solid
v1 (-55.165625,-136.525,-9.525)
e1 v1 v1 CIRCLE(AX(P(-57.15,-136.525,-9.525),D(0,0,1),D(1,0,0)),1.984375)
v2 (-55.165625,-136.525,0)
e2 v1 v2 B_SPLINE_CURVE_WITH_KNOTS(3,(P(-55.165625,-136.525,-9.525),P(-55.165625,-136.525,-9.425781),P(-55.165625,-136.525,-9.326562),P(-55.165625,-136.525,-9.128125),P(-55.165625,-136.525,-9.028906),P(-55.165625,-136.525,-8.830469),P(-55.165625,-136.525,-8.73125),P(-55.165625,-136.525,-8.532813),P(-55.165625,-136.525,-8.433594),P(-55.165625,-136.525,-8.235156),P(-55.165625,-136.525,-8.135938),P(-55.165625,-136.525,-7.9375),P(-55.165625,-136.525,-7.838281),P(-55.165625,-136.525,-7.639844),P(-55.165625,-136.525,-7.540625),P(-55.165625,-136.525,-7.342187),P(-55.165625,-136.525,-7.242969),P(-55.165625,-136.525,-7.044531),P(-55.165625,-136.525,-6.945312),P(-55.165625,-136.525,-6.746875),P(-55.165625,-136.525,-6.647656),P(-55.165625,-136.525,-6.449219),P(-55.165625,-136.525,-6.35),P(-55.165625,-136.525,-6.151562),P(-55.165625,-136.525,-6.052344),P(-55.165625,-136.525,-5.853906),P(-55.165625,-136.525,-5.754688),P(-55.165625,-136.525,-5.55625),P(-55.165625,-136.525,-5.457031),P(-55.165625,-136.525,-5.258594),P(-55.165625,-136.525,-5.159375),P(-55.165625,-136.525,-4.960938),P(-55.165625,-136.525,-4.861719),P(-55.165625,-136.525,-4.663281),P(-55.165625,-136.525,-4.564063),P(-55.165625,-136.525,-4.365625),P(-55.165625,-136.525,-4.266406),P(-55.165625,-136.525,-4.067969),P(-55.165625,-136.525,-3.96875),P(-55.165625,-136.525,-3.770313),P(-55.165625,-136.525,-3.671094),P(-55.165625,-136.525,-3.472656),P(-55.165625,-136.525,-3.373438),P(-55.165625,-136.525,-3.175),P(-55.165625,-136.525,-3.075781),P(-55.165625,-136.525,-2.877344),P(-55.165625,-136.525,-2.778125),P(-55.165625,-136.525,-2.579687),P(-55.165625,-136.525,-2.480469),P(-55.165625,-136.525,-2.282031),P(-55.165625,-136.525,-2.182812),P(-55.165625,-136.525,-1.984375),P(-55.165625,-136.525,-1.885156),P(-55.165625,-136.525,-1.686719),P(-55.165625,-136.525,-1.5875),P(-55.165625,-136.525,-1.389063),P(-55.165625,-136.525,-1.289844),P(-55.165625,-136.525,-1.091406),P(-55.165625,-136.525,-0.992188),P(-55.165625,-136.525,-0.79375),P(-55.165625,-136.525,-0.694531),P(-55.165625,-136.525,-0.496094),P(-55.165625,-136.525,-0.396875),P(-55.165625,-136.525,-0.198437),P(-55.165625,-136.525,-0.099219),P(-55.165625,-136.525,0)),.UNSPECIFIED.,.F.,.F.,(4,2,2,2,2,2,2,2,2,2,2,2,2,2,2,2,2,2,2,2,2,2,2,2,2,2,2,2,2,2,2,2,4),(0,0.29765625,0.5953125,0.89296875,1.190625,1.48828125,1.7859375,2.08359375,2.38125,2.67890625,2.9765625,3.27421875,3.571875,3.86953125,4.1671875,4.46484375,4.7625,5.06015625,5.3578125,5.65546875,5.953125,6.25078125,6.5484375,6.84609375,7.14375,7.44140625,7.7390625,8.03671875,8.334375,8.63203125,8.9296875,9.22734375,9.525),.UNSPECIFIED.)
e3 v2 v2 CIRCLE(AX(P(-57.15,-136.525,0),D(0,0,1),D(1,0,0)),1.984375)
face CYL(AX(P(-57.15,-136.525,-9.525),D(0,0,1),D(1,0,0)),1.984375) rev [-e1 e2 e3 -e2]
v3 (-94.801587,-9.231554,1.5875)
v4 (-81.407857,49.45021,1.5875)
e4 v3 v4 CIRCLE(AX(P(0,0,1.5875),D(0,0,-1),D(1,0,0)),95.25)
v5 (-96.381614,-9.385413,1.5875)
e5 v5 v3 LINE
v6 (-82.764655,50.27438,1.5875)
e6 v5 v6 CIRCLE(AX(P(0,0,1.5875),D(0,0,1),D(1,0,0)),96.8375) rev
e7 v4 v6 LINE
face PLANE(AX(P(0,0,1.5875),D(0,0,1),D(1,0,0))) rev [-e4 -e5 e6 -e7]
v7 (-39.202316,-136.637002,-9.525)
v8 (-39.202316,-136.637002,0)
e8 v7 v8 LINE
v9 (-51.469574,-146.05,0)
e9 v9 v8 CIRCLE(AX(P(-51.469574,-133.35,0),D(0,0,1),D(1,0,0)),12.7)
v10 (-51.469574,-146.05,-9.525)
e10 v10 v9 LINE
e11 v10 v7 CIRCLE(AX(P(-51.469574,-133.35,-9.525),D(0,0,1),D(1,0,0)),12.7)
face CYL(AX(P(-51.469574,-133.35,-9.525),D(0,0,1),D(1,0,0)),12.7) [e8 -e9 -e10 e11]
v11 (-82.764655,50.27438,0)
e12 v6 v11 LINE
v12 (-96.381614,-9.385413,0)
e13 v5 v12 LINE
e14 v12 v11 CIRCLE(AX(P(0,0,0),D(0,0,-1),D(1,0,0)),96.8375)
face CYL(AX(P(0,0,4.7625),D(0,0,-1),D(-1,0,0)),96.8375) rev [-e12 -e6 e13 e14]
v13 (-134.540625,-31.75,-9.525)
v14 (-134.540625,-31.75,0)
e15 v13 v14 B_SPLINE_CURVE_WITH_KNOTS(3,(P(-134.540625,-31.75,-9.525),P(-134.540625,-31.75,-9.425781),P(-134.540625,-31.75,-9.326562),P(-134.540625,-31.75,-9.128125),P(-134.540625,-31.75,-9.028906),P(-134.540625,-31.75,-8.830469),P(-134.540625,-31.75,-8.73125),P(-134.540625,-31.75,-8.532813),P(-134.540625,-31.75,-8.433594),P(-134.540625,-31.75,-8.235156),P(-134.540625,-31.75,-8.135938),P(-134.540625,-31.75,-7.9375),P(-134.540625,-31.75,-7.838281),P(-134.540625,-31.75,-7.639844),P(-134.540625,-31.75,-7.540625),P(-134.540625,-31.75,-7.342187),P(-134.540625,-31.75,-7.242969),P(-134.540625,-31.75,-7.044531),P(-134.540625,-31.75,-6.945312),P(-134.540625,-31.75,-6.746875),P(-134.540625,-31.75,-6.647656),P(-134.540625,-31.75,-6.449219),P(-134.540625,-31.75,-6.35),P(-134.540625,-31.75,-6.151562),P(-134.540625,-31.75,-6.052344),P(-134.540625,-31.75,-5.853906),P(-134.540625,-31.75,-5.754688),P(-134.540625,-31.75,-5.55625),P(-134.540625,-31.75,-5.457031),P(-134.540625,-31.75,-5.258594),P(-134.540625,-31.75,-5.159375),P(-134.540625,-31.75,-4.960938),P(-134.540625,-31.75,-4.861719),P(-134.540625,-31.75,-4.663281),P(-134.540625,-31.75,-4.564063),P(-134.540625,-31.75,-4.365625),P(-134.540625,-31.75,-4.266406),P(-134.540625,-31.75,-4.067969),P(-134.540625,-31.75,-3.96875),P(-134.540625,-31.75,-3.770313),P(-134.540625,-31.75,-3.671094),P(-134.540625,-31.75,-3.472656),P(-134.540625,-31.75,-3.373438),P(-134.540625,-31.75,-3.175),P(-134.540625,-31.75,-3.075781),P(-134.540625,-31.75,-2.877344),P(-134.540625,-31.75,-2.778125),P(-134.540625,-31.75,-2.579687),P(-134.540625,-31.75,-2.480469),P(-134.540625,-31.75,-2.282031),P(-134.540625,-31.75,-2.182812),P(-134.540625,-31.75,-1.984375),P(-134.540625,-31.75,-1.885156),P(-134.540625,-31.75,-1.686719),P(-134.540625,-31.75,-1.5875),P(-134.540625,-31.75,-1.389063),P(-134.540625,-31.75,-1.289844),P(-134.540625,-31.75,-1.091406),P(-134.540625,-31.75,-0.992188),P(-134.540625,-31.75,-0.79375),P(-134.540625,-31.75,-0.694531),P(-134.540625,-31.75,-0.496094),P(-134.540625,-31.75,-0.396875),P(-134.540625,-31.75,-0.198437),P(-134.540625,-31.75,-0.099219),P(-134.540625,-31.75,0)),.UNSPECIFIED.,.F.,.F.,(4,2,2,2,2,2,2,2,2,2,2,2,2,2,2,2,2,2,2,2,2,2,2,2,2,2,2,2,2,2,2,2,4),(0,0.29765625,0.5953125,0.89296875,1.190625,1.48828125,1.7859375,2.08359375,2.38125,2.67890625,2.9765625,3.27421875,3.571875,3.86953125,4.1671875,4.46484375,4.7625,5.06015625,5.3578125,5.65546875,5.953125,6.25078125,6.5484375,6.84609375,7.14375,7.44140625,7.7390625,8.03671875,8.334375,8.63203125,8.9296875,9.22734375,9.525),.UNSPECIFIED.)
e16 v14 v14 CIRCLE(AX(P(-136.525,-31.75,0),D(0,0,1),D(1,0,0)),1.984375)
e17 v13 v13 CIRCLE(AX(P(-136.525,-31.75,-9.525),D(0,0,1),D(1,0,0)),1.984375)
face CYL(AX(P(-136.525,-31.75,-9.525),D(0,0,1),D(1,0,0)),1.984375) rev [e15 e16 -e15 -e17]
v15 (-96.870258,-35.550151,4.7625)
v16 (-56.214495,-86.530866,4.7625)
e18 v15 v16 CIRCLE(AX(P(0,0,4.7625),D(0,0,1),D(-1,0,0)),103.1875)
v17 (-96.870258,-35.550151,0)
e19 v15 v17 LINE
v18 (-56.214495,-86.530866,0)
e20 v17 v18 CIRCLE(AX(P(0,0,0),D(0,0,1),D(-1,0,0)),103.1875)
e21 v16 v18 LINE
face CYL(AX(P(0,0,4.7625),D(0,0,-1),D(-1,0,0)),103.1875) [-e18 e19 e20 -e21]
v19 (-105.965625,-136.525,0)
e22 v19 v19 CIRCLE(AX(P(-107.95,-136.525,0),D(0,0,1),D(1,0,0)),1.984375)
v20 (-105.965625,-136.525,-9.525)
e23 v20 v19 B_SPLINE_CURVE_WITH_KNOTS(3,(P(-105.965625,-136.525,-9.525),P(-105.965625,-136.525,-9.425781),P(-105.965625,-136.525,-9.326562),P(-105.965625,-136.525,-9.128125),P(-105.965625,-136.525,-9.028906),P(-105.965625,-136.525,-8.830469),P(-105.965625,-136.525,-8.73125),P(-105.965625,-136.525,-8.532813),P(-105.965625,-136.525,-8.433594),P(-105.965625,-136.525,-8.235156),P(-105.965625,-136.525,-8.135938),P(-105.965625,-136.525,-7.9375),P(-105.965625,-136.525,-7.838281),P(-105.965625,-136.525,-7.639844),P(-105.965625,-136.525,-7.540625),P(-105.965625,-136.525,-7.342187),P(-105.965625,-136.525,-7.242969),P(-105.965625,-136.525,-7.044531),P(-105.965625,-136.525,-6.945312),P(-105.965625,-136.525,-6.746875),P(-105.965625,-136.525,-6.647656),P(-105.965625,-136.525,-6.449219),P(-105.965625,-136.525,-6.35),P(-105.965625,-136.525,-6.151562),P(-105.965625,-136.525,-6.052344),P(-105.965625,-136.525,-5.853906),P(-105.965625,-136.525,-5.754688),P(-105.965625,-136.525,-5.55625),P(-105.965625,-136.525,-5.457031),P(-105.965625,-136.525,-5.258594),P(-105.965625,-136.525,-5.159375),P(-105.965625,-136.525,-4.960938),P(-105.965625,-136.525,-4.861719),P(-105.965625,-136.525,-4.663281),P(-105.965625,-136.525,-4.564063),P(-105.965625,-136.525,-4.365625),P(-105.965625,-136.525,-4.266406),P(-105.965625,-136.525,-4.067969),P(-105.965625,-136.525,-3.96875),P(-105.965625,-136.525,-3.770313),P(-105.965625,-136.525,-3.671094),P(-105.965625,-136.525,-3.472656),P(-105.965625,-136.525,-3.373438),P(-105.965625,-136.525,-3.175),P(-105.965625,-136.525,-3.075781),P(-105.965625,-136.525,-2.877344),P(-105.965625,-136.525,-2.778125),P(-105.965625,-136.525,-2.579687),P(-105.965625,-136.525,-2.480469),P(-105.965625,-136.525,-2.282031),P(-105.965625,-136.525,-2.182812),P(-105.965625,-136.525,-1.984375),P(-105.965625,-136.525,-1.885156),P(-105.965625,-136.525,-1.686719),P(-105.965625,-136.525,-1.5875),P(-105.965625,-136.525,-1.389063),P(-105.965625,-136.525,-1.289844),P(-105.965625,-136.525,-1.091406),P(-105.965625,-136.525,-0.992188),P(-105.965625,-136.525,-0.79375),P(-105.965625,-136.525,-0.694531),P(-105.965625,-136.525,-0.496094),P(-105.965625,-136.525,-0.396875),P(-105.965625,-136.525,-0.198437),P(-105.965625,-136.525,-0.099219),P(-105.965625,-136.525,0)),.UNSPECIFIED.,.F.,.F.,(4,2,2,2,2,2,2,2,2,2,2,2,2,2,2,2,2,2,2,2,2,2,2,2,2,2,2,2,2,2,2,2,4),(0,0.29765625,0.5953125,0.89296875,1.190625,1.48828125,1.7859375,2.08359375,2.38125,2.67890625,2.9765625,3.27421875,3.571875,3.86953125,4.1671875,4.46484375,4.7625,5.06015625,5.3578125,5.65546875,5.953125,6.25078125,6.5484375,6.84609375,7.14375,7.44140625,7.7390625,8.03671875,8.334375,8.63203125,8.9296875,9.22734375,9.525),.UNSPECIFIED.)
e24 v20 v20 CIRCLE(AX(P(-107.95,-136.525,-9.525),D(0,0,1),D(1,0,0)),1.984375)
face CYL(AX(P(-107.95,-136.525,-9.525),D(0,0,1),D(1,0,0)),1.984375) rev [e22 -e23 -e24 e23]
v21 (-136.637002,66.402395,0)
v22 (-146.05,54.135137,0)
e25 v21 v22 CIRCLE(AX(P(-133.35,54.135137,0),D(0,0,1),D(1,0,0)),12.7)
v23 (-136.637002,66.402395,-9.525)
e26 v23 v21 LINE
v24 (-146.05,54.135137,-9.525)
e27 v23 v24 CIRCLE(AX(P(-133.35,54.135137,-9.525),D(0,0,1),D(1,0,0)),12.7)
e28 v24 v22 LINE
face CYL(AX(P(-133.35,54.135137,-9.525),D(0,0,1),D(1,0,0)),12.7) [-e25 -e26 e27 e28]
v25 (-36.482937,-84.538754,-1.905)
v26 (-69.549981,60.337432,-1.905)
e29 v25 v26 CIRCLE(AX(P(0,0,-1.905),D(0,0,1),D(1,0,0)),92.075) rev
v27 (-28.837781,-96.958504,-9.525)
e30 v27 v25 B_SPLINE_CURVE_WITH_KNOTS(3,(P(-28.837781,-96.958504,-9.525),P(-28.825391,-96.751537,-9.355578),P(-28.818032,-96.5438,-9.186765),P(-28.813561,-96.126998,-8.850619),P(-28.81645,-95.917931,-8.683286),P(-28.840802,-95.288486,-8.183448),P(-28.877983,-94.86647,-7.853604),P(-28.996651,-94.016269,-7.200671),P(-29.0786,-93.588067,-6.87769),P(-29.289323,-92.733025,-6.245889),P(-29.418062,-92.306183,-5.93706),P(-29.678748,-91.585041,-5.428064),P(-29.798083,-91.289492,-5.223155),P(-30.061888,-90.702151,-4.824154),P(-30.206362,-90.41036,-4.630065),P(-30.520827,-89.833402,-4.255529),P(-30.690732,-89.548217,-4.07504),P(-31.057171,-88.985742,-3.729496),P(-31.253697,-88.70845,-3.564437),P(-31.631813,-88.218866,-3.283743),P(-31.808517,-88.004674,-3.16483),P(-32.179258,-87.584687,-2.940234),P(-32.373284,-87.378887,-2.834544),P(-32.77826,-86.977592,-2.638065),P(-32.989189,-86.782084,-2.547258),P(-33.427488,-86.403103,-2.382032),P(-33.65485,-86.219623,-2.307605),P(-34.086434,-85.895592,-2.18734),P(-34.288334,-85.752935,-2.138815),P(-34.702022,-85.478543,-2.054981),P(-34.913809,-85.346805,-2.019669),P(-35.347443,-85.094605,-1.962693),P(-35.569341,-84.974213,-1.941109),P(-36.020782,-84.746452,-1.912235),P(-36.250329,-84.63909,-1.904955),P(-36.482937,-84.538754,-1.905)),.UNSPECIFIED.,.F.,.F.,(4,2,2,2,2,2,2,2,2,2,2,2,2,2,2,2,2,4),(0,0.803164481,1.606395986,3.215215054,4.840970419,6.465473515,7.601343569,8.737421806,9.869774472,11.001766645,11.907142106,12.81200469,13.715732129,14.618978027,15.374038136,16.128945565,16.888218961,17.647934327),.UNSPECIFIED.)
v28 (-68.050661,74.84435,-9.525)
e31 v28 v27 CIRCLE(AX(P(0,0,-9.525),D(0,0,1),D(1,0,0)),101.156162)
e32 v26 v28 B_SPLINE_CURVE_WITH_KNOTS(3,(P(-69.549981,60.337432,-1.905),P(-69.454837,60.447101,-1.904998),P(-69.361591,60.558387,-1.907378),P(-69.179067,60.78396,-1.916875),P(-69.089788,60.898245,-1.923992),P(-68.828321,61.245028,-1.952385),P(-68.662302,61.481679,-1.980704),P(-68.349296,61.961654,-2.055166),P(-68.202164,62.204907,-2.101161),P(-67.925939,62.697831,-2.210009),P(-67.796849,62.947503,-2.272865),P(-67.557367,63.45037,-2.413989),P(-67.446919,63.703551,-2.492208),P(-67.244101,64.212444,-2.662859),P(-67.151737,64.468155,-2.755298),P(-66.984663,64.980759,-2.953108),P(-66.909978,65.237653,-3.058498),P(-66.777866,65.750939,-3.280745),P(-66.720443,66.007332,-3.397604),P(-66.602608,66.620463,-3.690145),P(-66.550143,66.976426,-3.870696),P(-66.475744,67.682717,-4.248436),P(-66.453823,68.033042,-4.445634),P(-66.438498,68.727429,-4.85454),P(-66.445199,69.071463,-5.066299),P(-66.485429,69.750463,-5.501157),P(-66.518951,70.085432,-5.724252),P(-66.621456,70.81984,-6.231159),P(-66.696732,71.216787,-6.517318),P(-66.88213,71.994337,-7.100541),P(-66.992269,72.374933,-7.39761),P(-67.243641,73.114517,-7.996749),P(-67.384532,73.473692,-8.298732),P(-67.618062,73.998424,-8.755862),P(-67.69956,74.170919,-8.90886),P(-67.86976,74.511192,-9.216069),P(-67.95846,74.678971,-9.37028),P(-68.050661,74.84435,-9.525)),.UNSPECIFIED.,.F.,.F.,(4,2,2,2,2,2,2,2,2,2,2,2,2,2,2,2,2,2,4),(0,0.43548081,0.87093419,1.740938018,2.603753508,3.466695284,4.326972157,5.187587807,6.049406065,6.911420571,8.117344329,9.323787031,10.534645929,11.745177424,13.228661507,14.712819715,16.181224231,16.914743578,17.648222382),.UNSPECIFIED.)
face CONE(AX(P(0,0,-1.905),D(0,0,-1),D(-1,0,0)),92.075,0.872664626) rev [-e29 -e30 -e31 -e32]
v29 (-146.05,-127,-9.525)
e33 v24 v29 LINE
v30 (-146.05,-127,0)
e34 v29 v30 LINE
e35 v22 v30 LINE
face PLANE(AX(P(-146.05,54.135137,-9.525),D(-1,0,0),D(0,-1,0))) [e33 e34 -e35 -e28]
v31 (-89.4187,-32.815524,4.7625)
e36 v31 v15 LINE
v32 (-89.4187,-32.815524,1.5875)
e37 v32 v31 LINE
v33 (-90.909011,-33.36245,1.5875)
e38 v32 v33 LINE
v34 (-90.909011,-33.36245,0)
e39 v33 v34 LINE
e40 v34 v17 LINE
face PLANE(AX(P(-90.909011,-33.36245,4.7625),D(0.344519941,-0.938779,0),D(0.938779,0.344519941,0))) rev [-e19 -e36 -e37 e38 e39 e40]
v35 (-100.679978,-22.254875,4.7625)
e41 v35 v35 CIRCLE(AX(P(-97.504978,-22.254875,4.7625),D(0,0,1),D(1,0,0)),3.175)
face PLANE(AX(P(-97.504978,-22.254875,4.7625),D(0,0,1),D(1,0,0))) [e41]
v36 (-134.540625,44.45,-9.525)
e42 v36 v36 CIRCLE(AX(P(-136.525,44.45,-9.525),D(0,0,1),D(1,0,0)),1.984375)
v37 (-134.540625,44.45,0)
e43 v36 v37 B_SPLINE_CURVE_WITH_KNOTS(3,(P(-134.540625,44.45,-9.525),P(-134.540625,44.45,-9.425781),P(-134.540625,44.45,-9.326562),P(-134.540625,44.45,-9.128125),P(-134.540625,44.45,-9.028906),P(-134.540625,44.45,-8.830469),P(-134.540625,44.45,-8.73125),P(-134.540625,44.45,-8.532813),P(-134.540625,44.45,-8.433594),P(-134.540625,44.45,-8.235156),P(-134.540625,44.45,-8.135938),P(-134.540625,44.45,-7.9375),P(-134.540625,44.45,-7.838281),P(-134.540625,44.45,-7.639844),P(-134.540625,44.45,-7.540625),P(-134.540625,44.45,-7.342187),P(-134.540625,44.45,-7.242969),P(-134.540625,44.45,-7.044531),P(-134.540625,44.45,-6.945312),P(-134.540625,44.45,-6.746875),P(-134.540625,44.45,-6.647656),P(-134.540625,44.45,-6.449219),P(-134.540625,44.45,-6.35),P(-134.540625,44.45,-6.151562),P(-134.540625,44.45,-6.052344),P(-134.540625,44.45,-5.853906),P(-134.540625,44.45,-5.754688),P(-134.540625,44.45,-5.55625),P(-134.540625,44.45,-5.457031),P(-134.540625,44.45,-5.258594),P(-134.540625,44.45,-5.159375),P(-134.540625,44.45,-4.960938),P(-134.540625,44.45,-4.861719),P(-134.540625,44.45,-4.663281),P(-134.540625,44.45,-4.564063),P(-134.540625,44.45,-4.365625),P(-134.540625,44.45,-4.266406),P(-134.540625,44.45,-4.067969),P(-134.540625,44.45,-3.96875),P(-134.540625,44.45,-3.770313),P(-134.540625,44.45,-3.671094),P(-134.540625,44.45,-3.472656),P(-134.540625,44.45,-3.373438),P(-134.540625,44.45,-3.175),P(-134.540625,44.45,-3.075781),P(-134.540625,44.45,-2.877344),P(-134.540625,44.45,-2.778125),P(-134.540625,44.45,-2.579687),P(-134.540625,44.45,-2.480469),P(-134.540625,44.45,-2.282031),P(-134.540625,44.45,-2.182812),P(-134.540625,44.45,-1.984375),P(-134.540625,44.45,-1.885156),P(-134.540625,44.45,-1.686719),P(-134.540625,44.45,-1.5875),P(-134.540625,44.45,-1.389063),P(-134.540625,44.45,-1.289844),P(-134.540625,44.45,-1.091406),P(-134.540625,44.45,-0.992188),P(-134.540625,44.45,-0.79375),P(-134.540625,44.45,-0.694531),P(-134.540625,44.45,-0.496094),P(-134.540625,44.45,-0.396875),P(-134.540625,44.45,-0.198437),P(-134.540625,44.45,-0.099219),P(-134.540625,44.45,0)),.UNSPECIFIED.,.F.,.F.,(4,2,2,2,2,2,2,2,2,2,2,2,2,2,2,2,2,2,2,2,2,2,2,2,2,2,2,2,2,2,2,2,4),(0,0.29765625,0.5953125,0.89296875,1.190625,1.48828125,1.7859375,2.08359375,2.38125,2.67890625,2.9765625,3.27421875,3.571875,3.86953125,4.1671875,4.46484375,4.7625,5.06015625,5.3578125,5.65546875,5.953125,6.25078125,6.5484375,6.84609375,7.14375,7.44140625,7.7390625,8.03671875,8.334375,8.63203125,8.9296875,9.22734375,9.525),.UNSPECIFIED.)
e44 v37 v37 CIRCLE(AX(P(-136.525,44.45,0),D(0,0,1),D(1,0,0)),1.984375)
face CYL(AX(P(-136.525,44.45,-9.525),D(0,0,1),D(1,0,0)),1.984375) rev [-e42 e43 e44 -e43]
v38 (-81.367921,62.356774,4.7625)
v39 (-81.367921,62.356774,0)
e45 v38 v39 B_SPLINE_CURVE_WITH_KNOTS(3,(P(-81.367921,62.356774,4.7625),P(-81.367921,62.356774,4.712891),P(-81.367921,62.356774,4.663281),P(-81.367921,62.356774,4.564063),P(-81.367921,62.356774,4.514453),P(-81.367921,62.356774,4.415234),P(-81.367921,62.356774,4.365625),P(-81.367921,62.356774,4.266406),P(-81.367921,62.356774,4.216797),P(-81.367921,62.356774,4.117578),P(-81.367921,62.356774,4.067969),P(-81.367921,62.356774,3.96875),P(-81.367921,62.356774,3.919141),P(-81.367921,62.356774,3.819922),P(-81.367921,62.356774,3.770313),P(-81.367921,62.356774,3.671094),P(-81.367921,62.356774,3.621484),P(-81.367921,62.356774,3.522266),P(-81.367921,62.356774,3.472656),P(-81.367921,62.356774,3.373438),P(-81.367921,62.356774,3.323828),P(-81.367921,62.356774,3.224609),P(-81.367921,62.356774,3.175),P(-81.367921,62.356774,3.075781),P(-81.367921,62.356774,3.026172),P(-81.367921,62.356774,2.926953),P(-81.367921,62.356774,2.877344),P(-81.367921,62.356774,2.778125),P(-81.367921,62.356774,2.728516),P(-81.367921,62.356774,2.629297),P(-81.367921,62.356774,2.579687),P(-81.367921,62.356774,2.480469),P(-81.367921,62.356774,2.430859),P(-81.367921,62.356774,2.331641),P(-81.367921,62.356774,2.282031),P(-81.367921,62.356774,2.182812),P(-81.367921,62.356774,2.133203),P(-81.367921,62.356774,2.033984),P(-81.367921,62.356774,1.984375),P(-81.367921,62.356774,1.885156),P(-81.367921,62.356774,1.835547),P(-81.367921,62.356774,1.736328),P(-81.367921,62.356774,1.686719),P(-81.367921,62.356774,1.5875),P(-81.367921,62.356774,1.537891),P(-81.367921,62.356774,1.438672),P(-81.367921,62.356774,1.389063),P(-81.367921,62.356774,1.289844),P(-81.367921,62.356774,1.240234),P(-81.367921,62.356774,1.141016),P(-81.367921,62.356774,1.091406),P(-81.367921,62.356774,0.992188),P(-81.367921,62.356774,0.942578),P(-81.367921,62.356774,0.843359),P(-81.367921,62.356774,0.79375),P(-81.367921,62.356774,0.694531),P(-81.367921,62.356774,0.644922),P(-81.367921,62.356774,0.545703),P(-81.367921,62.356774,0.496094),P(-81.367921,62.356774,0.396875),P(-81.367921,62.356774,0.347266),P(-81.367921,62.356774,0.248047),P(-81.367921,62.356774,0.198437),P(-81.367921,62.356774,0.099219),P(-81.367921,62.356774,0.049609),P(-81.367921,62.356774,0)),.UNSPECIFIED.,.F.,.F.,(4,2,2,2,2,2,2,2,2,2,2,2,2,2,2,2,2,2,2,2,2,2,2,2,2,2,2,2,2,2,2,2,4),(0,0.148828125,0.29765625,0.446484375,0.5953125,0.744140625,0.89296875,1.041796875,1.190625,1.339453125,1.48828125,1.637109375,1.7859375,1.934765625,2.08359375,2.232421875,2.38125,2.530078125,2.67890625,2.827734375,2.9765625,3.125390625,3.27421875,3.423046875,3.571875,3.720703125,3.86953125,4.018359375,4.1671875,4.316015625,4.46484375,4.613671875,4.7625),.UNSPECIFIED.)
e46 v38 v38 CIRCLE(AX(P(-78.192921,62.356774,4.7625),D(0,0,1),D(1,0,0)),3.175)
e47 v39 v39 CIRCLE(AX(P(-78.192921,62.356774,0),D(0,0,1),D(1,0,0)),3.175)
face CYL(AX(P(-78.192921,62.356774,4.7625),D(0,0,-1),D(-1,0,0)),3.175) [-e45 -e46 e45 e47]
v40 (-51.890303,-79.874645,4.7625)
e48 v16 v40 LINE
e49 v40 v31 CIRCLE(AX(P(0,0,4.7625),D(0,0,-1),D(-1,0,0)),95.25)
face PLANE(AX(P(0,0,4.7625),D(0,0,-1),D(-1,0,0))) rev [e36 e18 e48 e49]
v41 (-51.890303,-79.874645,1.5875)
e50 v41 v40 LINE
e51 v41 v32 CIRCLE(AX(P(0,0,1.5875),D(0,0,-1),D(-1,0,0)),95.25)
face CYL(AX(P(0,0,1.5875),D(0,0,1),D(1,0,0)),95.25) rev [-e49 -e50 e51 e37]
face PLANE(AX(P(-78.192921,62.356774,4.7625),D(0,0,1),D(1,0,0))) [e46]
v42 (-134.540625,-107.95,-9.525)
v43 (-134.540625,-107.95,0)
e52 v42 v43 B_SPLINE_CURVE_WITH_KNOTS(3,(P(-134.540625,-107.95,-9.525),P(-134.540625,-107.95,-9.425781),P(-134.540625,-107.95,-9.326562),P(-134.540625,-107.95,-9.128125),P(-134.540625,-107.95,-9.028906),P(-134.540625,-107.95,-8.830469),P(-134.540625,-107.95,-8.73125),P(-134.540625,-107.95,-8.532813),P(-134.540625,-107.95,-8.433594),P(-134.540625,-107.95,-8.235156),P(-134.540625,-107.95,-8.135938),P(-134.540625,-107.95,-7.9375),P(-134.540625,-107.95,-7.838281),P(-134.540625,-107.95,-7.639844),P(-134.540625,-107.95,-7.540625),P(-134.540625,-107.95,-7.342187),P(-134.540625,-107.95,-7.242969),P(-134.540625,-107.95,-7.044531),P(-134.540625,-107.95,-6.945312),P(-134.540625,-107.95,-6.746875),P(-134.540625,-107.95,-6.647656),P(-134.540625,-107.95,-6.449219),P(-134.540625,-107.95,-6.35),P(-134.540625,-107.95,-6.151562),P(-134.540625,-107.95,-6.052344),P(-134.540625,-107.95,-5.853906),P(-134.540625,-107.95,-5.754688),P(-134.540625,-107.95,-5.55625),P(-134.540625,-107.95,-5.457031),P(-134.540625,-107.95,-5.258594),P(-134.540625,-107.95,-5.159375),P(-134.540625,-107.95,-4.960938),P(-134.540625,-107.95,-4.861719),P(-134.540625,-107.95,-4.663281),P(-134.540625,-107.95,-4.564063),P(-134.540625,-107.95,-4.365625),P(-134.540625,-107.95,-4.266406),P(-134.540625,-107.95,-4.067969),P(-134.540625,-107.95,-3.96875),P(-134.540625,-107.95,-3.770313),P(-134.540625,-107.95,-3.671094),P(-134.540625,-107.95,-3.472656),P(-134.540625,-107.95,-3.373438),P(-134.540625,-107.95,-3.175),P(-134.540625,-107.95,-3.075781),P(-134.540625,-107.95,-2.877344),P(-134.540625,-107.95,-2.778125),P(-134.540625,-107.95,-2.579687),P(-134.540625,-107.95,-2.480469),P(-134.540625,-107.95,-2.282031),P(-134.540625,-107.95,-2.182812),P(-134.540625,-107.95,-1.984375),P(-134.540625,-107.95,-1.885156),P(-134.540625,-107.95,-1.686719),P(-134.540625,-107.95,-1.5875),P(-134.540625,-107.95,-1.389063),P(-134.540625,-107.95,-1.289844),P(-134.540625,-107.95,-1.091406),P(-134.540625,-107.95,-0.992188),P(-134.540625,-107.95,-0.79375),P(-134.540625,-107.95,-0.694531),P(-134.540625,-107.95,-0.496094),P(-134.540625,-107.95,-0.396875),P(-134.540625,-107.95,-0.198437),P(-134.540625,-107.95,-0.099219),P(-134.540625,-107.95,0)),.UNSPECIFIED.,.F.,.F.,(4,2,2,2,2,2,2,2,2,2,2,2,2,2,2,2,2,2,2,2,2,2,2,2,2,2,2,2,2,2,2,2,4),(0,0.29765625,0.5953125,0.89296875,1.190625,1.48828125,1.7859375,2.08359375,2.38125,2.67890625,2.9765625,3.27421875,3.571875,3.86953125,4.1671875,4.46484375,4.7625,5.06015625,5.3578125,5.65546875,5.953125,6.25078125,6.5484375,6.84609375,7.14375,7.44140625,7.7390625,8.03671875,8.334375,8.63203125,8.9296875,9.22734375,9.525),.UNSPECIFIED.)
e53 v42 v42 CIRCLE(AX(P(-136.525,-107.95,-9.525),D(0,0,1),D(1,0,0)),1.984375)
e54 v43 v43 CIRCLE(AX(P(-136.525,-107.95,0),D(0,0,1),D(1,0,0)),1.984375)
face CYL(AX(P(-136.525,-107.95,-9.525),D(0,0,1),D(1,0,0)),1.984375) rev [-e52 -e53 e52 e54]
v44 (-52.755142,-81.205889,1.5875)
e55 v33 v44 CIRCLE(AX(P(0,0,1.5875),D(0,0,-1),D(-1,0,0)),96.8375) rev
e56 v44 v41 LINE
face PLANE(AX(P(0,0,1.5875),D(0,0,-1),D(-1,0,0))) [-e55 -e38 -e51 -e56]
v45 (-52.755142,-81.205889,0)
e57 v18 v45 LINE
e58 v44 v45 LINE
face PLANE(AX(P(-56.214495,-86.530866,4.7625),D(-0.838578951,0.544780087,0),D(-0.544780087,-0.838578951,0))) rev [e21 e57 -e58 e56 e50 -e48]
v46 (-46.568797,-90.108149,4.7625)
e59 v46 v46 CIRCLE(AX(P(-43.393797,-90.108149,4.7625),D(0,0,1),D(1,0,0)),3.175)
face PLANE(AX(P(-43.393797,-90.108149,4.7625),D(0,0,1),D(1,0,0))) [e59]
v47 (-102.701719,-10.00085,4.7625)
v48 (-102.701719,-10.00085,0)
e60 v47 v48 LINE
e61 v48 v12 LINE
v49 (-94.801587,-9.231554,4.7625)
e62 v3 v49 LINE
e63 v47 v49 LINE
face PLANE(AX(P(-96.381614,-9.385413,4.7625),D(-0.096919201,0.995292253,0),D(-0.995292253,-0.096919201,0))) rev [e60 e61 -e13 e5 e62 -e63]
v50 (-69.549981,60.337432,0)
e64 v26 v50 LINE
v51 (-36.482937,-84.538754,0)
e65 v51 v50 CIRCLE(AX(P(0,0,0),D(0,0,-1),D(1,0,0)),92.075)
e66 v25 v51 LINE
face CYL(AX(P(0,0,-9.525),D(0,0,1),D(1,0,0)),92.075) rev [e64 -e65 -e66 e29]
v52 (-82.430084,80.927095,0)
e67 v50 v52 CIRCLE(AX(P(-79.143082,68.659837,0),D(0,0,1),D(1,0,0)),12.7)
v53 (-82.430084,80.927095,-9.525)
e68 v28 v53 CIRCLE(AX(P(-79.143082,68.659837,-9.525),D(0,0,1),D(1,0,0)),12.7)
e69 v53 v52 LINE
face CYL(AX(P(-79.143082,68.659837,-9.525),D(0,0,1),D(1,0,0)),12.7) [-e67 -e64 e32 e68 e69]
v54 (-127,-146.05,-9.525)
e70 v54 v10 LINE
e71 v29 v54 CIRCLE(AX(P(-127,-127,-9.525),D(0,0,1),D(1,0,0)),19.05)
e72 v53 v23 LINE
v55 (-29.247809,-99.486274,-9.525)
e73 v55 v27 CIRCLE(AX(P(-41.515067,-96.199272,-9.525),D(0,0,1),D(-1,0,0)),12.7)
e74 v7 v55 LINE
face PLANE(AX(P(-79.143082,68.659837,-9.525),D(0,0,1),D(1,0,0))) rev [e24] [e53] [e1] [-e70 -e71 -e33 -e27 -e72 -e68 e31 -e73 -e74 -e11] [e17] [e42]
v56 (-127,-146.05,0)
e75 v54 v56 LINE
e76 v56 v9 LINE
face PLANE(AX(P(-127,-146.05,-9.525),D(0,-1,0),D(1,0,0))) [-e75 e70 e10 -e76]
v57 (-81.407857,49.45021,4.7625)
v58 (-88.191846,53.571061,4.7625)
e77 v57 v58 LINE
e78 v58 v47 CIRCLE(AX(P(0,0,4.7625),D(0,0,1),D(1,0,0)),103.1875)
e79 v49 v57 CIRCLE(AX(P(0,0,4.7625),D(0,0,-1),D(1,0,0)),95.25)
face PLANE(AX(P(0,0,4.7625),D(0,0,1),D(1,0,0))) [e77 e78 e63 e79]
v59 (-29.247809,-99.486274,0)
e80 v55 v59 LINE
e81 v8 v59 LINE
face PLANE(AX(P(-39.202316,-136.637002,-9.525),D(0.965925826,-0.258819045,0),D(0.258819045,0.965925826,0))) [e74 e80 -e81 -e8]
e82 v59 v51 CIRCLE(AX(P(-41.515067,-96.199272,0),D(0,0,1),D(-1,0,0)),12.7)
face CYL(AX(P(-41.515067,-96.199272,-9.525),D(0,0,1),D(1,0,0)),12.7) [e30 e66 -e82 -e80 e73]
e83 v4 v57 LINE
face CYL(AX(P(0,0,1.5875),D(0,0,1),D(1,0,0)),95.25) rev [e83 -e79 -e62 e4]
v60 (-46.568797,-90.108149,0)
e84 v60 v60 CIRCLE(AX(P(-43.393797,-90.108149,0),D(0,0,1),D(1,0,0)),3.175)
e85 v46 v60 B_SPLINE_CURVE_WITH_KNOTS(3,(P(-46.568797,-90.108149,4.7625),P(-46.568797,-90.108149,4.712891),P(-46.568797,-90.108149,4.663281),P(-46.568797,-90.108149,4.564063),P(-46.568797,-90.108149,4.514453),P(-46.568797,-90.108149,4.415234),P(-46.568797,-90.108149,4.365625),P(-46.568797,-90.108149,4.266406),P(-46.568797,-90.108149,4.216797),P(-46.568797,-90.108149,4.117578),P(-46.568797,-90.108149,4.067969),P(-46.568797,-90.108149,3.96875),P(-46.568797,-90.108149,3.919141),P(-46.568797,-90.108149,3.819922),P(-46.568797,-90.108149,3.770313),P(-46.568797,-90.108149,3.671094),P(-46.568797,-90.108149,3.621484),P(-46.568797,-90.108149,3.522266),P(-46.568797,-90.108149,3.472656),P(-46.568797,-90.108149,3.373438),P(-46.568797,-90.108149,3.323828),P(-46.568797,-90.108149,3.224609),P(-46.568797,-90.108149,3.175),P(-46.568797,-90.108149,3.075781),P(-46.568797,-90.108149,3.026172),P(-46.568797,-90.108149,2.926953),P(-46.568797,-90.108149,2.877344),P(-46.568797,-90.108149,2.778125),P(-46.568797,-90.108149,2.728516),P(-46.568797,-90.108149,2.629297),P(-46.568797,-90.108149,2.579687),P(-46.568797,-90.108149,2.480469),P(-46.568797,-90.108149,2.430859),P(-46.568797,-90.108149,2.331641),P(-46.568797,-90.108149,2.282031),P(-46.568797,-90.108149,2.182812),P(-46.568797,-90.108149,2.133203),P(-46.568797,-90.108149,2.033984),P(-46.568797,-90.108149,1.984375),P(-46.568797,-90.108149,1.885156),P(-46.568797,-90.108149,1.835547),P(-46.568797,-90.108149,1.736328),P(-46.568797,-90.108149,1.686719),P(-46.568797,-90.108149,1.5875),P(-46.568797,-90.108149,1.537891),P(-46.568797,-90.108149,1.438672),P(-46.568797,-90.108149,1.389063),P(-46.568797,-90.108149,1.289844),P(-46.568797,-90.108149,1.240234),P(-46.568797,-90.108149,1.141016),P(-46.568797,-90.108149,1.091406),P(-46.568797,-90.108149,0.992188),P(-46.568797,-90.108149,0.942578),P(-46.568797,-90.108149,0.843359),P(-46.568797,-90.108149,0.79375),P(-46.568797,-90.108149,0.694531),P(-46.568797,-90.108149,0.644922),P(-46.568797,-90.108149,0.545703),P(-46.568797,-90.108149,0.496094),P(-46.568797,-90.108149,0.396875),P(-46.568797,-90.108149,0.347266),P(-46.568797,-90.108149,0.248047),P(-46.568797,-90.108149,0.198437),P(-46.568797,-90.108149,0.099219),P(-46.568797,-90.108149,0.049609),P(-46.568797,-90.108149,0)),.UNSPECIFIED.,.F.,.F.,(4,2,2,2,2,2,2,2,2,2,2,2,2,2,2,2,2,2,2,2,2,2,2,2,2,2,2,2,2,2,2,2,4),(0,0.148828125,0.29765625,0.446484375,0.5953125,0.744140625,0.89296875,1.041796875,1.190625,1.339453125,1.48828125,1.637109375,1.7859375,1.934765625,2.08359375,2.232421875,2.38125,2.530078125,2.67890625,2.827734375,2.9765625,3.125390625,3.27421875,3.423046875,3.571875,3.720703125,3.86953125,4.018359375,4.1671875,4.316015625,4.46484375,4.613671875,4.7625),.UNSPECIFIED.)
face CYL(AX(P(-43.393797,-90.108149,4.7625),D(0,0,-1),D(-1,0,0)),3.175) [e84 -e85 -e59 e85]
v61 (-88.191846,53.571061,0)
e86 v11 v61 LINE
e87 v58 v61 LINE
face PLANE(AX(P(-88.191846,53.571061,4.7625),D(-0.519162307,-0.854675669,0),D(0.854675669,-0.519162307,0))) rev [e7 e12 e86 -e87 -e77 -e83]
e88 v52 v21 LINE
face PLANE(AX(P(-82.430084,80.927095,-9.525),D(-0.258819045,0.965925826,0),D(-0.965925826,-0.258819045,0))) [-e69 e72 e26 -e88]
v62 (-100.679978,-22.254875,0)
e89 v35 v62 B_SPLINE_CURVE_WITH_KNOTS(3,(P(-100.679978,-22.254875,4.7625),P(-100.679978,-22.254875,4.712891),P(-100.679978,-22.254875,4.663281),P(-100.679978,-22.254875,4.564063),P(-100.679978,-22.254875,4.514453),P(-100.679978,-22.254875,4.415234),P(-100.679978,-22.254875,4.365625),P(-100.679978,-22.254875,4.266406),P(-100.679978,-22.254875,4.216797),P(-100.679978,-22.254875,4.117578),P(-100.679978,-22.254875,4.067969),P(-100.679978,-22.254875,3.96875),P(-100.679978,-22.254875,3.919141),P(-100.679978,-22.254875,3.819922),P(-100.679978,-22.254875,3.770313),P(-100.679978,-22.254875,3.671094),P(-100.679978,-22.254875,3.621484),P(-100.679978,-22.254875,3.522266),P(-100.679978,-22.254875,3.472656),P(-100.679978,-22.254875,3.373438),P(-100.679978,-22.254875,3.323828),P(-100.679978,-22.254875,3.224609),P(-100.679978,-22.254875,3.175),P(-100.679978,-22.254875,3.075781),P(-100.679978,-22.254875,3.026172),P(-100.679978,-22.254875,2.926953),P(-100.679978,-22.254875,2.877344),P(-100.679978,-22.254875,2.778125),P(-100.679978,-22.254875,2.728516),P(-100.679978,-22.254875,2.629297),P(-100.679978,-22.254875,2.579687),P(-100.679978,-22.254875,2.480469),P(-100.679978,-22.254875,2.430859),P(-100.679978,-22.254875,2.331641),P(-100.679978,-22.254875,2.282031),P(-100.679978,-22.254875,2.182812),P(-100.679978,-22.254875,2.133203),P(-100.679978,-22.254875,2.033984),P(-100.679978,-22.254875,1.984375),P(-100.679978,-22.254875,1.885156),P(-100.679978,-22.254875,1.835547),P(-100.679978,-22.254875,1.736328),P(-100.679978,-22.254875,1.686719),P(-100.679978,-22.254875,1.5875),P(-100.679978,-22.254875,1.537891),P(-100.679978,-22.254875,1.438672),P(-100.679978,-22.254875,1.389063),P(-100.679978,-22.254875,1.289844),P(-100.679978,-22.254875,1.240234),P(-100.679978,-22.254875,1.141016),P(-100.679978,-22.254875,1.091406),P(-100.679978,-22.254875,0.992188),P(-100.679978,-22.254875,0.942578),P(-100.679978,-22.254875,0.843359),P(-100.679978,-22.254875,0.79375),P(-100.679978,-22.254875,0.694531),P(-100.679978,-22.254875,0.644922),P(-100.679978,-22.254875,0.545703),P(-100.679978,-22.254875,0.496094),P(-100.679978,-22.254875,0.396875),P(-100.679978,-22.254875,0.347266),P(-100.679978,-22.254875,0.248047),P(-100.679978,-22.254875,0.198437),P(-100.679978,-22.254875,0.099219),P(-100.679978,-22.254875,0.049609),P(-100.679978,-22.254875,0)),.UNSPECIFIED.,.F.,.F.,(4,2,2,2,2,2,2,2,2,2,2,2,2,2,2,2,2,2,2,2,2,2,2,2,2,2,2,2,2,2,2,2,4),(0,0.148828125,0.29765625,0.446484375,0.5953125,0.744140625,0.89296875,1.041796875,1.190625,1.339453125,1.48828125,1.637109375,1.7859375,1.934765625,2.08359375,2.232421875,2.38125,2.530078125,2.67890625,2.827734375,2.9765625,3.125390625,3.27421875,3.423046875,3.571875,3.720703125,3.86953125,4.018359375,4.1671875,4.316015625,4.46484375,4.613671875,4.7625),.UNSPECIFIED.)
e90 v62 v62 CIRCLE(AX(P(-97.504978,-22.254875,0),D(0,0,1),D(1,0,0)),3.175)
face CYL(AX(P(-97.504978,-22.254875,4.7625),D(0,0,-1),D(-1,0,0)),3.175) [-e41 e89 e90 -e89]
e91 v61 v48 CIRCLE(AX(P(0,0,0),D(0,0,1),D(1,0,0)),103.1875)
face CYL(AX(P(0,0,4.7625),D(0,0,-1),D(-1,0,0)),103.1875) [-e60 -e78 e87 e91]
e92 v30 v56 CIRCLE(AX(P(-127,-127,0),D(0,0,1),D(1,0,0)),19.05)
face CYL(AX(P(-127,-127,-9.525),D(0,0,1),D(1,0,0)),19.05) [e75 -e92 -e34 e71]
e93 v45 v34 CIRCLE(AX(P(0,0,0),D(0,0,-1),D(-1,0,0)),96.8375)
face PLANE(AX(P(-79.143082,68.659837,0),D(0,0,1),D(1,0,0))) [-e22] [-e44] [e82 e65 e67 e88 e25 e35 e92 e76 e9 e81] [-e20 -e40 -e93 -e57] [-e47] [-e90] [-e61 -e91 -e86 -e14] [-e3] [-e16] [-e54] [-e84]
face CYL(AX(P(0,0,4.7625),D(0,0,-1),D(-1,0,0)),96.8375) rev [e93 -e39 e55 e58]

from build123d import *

# Parameters (mm, degrees)
SKETCH1_R             = 3.175
BOSS_EXTRUDE1_DEPTH   = 4.7625
BOSS_EXTRUDE1_2_DEPTH = 4.7625
BOSS_EXTRUDE1_3_DEPTH = 4.7625
BOSS_EXTRUDE1_4_DEPTH = 4.7625
BOSS_EXTRUDE1_5_DEPTH = 4.7625
SKETCH2_R             = 1.984375
BOSS_EXTRUDE2_DEPTH   = 9.525
BOSS_EXTRUDE3_DEPTH   = 3.175
CHAMFER1_SIZE         = 9.081162376
CHAMFER1_SIZE_2       = 7.62


with BuildPart() as part:
    # Sketch1 → Boss-Extrude1 (new body)
    with BuildSketch(Plane.XY):
        with Locations(Location((-78.19292114, 62.356773808, 0), (0, 0, 180))):
            Circle(SKETCH1_R)
    extrude(amount=BOSS_EXTRUDE1_DEPTH)



with BuildPart() as body_2:
    # Sketch1 → Boss-Extrude1 2 (new body)
    with BuildSketch(Plane.XY):
        with Locations(Location((-97.504977817, -22.254874907, 0), (0, 0, 180))):
            Circle(SKETCH1_R)
    extrude(amount=BOSS_EXTRUDE1_2_DEPTH)


with BuildPart() as body_3:
    # Sketch1 → Boss-Extrude1 3 (new body)
    with BuildSketch(Plane.XY):
        with Locations(Location((-43.393797458, -90.108148901, 0), (0, 0, 180))):
            Circle(SKETCH1_R)
    extrude(amount=BOSS_EXTRUDE1_3_DEPTH)


with BuildPart() as body_4:
    # Sketch1 → Boss-Extrude1 4 (new body)
    with BuildSketch(Plane.XY):
        with BuildLine():
            Line((-88.191845565, 53.571060584), (-82.764655069, 50.274379933))
            ThreePointArc((-82.764655069, 50.274379933), (-94.409581696, 21.548370942), (-96.381613527, -9.385413164))
            Line((-96.381613527, -9.385413164), (-102.701719332, -10.000850093))
            ThreePointArc((-102.701719332, -10.000850093), (-100.600373938, 22.961378873), (-88.191845565, 53.571060584))
        make_face()
    extrude(amount=BOSS_EXTRUDE1_4_DEPTH)


with BuildPart() as body_5:
    # Sketch1 → Boss-Extrude1 5 (new body)
    with BuildSketch(Plane.XY):
        with BuildLine():
            Line((-90.909011383, -33.362449786), (-96.870258031, -35.550151411))
            ThreePointArc((-96.870258031, -35.550151411), (-80.675236097, -64.336353929), (-56.214495182, -86.53086552))
            Line((-56.214495182, -86.53086552), (-52.755141633, -81.20588918))
            ThreePointArc((-52.755141633, -81.20588918), (-75.710606183, -60.377193687), (-90.909011383, -33.362449786))
        make_face()
    extrude(amount=BOSS_EXTRUDE1_5_DEPTH)


with BuildPart() as part_1:
    add(part.part)

    add(body_2.part)  # Boss-Extrude2 merges body 2

    add(body_3.part)  # Boss-Extrude2 merges body 3
    # Sketch2 → Boss-Extrude2 (add)
    with BuildSketch(Plane.XY):
        with BuildLine():
            Line((-82.430084054, 80.927094637), (-136.637001873, 66.402394783))
            ThreePointArc((-136.637001873, 66.402394783), (-143.425587422, 61.866406938), (-146.05, 54.13513679))
            Line((-146.05, 54.13513679), (-146.05, -127))
            ThreePointArc((-146.05, -127), (-140.470384182, -140.470384182), (-127, -146.05))
            Line((-127, -146.05), (-51.469574148, -146.05))
            ThreePointArc((-51.469574148, -146.05), (-43.738303999, -143.425587422), (-39.202316154, -136.637001873))
            Line((-39.202316154, -136.637001873), (-29.247808511, -99.486273586))
            ThreePointArc((-29.247808511, -99.486273586), (-30.083781104, -90.666124862), (-36.482937232, -84.53875393))
            ThreePointArc((-36.482937232, -84.53875393), (-89.766487514, -20.488614994), (-69.549981311, 60.337432202))
            ThreePointArc((-69.549981311, 60.337432202), (-68.376222335, 75.395171012), (-82.430084054, 80.927094637))
        make_face()
        with Locations((-136.525, 44.45)):
            Circle(SKETCH2_R, mode=Mode.SUBTRACT)
        with Locations((-136.525, -31.75)):
            Circle(SKETCH2_R, mode=Mode.SUBTRACT)
        with Locations((-136.525, -107.95)):
            Circle(SKETCH2_R, mode=Mode.SUBTRACT)
        with Locations((-57.15, -136.525)):
            Circle(SKETCH2_R, mode=Mode.SUBTRACT)
        with Locations((-107.95, -136.525)):
            Circle(SKETCH2_R, mode=Mode.SUBTRACT)
    extrude(amount=-BOSS_EXTRUDE2_DEPTH)


    add(body_4.part)  # Boss-Extrude3 merges body 4

    add(body_5.part)  # Boss-Extrude3 merges body 5
    # Sketch3 → Boss-Extrude3 (add)
    with BuildSketch(Plane.XY.offset(4.7625)):
        with BuildLine():
            Line((-81.407857445, 49.45020977), (-88.191845565, 53.571060584))
            ThreePointArc((-88.191845565, 53.571060584), (-100.600373938, 22.961378873), (-102.701719332, -10.000850093))
            Line((-102.701719332, -10.000850093), (-94.801587075, -9.231553932))
            ThreePointArc((-94.801587075, -9.231553932), (-92.861883635, 21.195118959), (-81.407857445, 49.45020977))
        make_face()
        with BuildLine():
            Line((-96.870258031, -35.550151411), (-89.418699721, -32.815524379))
            ThreePointArc((-89.418699721, -32.815524379), (-74.469448705, -59.387403627), (-51.890303245, -79.874645095))
            Line((-51.890303245, -79.874645095), (-56.214495182, -86.53086552))
            ThreePointArc((-56.214495182, -86.53086552), (-80.675236097, -64.336353929), (-96.870258031, -35.550151411))
        make_face()
    extrude(amount=-BOSS_EXTRUDE3_DEPTH)

    # Chamfer1
    # the kernel refuses this chamfer: 9.081162376, 7.62 mm, written as the material it takes off along each edge
    with BuildSketch(Plane(origin=(0, 0, -9.525), x_dir=(-0.15246082974719, -0.9883095139645264, 0), z_dir=(0.9883095139645264, -0.15246082974719, 0))) as chamfer1_piece_1:
        Polygon((92.075 + CHAMFER1_SIZE, 0), (92.075, -CHAMFER1_SIZE_2), (92.075, 0), align=None)
    revolve(axis=Axis((0, 0, -9.525), (0, 0, -1)), revolution_arc=136.746589735, mode=Mode.SUBTRACT)


solid = part_1.part
